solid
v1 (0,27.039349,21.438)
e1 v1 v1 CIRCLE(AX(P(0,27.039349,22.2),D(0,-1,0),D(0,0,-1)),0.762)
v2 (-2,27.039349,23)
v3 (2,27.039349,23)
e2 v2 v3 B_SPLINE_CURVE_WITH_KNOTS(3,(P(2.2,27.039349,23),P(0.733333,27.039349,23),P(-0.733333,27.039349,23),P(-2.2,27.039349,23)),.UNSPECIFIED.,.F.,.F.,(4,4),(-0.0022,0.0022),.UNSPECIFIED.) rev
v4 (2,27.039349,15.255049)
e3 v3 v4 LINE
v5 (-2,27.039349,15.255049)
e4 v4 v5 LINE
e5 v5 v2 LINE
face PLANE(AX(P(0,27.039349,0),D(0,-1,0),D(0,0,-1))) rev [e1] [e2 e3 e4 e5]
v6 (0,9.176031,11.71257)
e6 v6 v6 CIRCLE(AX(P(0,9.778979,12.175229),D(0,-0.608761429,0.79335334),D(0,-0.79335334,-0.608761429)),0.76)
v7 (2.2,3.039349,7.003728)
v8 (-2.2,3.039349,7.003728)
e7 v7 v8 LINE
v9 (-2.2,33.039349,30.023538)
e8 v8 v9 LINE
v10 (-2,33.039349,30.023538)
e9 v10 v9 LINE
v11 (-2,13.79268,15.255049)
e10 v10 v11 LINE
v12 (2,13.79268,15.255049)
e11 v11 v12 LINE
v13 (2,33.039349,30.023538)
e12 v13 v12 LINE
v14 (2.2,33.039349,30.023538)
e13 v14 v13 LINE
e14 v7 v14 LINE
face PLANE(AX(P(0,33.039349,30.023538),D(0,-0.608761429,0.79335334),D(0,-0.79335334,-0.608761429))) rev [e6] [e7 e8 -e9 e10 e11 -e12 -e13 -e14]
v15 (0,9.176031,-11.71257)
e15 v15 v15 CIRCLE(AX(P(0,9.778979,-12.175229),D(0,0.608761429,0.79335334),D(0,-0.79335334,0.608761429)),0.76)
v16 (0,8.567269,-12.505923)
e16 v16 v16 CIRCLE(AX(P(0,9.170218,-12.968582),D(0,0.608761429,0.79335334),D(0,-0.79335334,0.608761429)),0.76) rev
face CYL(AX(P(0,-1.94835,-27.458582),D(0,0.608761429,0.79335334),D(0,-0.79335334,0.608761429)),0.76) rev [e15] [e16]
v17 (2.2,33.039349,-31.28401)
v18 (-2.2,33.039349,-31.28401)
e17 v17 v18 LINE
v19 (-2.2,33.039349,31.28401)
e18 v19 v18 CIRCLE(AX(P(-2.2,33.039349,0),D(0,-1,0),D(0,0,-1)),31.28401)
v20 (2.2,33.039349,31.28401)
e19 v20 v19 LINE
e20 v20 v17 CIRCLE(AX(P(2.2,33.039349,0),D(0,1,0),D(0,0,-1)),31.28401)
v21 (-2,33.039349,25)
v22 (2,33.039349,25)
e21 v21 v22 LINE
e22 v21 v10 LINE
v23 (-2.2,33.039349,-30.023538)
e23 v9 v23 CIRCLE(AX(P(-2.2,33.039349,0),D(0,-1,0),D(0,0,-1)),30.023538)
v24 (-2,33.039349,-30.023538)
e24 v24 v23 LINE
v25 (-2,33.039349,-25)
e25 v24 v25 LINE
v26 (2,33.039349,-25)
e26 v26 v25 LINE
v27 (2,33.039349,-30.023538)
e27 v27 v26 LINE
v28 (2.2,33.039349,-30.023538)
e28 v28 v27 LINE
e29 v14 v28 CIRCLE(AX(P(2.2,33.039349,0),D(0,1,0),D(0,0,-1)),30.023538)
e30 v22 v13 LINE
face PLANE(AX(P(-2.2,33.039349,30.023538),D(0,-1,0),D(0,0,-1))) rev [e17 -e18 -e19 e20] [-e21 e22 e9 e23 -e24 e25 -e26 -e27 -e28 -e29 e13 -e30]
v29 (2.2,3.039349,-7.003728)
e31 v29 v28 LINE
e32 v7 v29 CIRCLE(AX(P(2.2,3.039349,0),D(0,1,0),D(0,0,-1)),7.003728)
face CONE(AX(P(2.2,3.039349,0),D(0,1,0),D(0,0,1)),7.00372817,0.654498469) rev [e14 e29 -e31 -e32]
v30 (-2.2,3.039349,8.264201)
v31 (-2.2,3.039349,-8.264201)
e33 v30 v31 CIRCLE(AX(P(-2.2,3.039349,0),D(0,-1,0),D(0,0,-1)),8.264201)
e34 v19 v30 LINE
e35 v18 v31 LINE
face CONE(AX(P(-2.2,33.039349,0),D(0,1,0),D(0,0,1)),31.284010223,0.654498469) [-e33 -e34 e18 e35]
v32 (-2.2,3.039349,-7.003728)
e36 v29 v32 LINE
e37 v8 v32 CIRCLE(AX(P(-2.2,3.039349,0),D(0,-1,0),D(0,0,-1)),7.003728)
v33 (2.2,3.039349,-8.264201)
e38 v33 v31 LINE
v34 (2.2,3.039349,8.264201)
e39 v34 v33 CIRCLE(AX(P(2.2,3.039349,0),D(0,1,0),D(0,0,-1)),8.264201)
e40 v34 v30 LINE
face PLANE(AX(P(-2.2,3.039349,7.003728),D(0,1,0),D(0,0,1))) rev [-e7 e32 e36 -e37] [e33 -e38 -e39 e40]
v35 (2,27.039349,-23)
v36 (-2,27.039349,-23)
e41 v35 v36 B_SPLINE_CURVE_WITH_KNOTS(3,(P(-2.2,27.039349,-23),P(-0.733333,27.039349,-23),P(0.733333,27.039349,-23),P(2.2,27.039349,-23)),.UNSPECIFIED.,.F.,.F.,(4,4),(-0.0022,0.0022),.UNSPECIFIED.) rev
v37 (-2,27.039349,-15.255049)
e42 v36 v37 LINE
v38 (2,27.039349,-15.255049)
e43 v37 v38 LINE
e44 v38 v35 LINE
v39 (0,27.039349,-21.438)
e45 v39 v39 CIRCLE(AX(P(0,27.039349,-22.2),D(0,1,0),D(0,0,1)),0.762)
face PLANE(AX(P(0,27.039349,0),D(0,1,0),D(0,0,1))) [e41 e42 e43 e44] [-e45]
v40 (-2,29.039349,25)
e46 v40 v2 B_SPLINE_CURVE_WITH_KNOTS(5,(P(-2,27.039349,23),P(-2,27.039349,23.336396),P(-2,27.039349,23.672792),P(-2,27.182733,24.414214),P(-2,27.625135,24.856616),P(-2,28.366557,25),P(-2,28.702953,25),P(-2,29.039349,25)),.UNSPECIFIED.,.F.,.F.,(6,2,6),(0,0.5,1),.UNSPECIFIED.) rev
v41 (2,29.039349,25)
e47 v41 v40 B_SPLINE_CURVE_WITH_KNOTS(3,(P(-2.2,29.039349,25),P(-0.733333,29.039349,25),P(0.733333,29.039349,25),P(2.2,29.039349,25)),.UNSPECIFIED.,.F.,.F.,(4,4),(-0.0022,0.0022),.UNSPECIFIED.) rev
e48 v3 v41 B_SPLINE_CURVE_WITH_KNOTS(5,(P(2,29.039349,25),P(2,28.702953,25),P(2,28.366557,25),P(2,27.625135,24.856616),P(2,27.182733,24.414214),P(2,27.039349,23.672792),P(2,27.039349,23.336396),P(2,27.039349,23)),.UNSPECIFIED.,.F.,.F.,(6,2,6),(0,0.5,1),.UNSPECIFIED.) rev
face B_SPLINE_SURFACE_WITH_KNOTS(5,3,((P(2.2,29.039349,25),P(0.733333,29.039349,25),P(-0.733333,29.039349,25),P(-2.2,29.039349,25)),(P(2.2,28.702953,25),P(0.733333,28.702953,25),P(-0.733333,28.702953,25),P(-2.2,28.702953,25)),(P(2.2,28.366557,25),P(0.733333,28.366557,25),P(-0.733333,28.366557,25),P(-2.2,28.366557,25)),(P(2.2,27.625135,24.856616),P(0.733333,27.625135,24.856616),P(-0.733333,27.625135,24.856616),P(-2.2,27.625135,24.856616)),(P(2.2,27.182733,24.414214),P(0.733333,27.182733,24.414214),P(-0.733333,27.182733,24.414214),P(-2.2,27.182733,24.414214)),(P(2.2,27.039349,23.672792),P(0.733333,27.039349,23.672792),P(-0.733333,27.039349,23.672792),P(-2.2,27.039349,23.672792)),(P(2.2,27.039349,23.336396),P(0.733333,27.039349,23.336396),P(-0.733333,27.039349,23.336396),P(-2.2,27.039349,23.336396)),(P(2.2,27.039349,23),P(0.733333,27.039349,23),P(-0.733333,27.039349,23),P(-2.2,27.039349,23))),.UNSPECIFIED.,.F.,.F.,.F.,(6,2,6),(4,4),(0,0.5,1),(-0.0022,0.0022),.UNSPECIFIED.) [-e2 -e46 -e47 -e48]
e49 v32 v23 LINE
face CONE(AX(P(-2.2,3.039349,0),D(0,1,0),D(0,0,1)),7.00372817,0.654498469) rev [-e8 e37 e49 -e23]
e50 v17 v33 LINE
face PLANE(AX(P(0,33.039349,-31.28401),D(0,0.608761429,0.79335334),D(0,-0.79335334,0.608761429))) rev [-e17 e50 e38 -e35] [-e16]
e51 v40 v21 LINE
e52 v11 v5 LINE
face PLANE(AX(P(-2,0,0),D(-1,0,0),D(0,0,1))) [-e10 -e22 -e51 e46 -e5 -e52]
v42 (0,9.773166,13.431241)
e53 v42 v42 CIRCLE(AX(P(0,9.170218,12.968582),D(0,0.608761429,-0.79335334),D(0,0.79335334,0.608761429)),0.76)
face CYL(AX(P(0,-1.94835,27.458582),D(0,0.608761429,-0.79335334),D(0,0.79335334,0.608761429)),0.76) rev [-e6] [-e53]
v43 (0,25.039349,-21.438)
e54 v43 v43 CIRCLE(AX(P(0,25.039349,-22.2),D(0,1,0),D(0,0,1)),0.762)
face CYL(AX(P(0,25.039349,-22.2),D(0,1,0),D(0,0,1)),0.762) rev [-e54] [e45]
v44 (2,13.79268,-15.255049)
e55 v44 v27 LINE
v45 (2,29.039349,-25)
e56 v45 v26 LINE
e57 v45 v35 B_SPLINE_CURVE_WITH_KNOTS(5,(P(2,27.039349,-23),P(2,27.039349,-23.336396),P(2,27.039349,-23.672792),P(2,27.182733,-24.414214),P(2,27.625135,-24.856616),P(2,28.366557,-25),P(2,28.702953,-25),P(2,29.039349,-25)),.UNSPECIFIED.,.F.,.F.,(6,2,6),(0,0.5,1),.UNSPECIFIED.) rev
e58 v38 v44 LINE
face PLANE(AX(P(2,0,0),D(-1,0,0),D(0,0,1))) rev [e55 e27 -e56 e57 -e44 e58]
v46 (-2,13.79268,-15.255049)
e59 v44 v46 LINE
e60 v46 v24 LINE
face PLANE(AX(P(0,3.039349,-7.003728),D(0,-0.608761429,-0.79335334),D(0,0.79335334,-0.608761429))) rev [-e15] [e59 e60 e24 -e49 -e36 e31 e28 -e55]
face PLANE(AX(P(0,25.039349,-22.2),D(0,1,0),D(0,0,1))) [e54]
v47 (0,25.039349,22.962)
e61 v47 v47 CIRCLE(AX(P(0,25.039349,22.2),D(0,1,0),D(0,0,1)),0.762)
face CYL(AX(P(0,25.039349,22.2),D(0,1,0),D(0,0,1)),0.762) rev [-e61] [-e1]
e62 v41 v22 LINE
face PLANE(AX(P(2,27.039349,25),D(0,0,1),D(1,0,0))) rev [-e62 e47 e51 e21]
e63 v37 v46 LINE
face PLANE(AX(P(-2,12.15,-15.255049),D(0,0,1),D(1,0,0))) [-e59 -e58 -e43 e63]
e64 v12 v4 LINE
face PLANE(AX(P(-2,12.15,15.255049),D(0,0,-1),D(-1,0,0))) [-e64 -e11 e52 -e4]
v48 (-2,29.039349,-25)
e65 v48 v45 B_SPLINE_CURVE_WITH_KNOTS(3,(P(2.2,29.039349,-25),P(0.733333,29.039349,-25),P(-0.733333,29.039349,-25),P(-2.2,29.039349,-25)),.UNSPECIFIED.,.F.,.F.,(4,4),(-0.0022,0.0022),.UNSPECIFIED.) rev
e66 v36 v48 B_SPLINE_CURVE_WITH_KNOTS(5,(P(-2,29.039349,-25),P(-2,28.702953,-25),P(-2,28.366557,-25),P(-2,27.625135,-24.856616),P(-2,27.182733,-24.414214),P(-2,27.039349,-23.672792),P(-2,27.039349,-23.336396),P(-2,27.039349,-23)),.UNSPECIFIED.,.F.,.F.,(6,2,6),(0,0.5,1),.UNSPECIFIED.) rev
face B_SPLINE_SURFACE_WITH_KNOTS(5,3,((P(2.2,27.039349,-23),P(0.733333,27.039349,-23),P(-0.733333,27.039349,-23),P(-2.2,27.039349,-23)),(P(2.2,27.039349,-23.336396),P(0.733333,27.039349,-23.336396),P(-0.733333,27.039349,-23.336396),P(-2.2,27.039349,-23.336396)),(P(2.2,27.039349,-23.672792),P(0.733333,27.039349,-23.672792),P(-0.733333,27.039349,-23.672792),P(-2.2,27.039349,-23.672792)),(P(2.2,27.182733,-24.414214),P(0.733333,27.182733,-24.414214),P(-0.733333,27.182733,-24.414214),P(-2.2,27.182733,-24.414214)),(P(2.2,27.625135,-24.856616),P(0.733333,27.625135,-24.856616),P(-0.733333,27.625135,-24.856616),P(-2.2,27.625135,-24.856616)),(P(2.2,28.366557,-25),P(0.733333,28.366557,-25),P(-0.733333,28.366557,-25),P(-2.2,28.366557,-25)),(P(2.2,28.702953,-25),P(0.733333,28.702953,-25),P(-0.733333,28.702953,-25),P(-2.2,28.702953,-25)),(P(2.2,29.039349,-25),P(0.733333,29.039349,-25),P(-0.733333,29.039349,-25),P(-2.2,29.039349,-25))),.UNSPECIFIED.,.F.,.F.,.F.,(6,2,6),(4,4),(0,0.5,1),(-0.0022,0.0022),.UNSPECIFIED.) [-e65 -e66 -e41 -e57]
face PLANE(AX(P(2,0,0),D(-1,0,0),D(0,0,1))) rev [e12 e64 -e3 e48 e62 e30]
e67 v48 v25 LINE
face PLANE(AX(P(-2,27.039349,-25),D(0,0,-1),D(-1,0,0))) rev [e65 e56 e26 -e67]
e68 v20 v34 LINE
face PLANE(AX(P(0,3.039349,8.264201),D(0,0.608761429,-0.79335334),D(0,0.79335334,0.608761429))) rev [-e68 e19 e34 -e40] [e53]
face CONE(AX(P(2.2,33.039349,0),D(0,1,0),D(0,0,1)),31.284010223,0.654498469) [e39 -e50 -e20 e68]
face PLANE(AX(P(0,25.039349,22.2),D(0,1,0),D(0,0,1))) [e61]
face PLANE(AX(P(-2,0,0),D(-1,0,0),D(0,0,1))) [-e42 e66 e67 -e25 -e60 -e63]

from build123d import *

# Parameters (mm, degrees)
CONEREVOLVE_ANGLE                = 90
CONEREVOLVE_OTHER_WAY_ANGLE      = 90
CONE_EDGE_BOSS_EXTRUDE15_DEPTH   = 2.2
MOUNTING_HOLE_CUT_EXTRUDE6_REACH = 61.483
SKETCH90_R                       = 0.76
REINFORCINGSPAR_DEPTH            = 2
REINFORCINGSPAR_DEPTH_BACK       = 2
SKETCH94_W                       = 4
SKETCH94_H                       = 9.744950827
CUT_EXTRUDE1_DEPTH               = 6
FILLET2_SIZE                     = 2
SKETCH98_R                       = 0.762
CUT_EXTRUDE2_DEPTH               = 8


with BuildPart() as part:
    # Sketch88 → ConeRevolve (revolve)
    with BuildSketch(Plane(origin=(50.074313091, 0, 0), x_dir=(1, 0, 0), z_dir=(0, 0, 1))):
        Polygon((-82.2978509, 33.039348741), (-59.278041261, 3.039348741), (-60.538513675, 3.039348741), (-83.558323314, 33.039348741), align=None)
    revolve(axis=Axis((-2.2, -0.345734695, 0), (0, 1, 0)), revolution_arc=CONEREVOLVE_ANGLE)

    # Sketch88 → ConeRevolve other way (revolve)
    with BuildSketch(Plane(origin=(50.074313091, 0, 0), x_dir=(1, 0, 0), z_dir=(0, 0, 1))):
        Polygon((-82.2978509, 33.039348741), (-59.278041261, 3.039348741), (-60.538513675, 3.039348741), (-83.558323314, 33.039348741), align=None)
    revolve(axis=Axis((-2.2, -0.345734695, 0), (0, -1, 0)), revolution_arc=CONEREVOLVE_OTHER_WAY_ANGLE)

    # Sketch89 → Cone-Edge-Boss-Extrude15 (add)
    with BuildSketch(Plane(origin=(-2.2, 0, 0), x_dir=(0, 0, -1), z_dir=(1, 0, 0))):
        Polygon((-7.00372817, 3.039348741), (-8.264200584, 3.039348741), (-31.284010223, 33.039348741), (-30.023537809, 33.039348741), align=None)
        Polygon((8.264200584, 3.039348741), (7.00372817, 3.039348741), (30.023537809, 33.039348741), (31.284010223, 33.039348741), align=None)
    extrude(amount=CONE_EDGE_BOSS_EXTRUDE15_DEPTH)

    # Cone-Edge-Mirror: part across plane


with BuildPart() as part_1:
    add(part.part)
    add(part.part.mirror(Plane(origin=(0, 0, 0), x_dir=(0, 0, 1), z_dir=(1, 0, 0))))

    # Sketch90 → Mounting-Hole-Cut-Extrude6 (cut, up to next)
    with BuildSketch(Plane(origin=(0, -2.256187259, 2.940320481), x_dir=(1, 0, 0), z_dir=(2.7745173069220206e-15, -0.6087614290087164, 0.7933533402912384)), mode=Mode.PRIVATE) as mounting_hole_cut_extrude6_sk1:
        with Locations(Location((0, 15.169995435, 0), (0, 0, 90))):
            Circle(SKETCH90_R)
    mounting_hole_cut_extrude6_tool1 = extrude(mounting_hole_cut_extrude6_sk1.sketch, amount=MOUNTING_HOLE_CUT_EXTRUDE6_REACH, mode=Mode.PRIVATE) & part_1.part
    mounting_hole_cut_extrude6 = mounting_hole_cut_extrude6_tool1.solids().sort_by_distance((0, 9.778979, 12.175229))[0]
    add(mounting_hole_cut_extrude6, mode=Mode.SUBTRACT)

    # Mirror1: Mounting-Hole-Cut-Extrude6 across plane
    add(mounting_hole_cut_extrude6.mirror(Plane.XY), mode=Mode.SUBTRACT)

    # Sketch92 → ReinforcingSpar (add, two sides: drawn at the far end of the back side and taken through both)
    with BuildSketch(Plane(origin=(0, 0, 4.051072987), x_dir=(0, 0, -1), z_dir=(1, 0, 0)).offset(-REINFORCINGSPAR_DEPTH_BACK)):
        Polygon((-11.203976186, 33.039348741), (-27.232937236, 33.039348741), (-11.203976186, 12.15), align=None)
        Polygon((19.30612216, 33.039348741), (35.33508321, 33.039348741), (19.30612216, 12.15), align=None)
    extrude(amount=REINFORCINGSPAR_DEPTH + REINFORCINGSPAR_DEPTH_BACK)

    # Sketch94 → Cut-Extrude1 (cut)
    with BuildSketch(Plane(origin=(0, 33.039348741, 0), x_dir=(1, 0, 0), z_dir=(0, 1, 0))):
        with Locations((0, 20.127524587)):
            Rectangle(SKETCH94_W, SKETCH94_H)
        with Locations((0, -20.127524587)):
            Rectangle(SKETCH94_W, SKETCH94_H)
    extrude(amount=-CUT_EXTRUDE1_DEPTH, mode=Mode.SUBTRACT)

    # Fillet2
    # a fillet whose section is not a circle: 2 mm, written as the material it adds along each edge
    with BuildSketch(Plane(origin=(-2, 27.039348741, -25), x_dir=(0, 1, 0), z_dir=(1, 0, 0))) as fillet2_piece_1:
        with BuildLine():
            add(Edge.make_bspline([(FILLET2_SIZE, 0), (FILLET2_SIZE * 0.831801948466, 0), (FILLET2_SIZE * 0.663603896932, 0), (FILLET2_SIZE * 0.292893218813, FILLET2_SIZE * 0.0716919198361), (FILLET2_SIZE * 0.0716919198361, FILLET2_SIZE * 0.292893218813), (0, FILLET2_SIZE * 0.663603896932), (0, FILLET2_SIZE * 0.831801948466), (0, FILLET2_SIZE)], knots=[0, 0, 0, 0, 0, 0, 0.5, 0.5, 1, 1, 1, 1, 1, 1], degree=5))
            Line((0, FILLET2_SIZE), (-FILLET2_SIZE * 0.02, FILLET2_SIZE))
            Line((-FILLET2_SIZE * 0.02, FILLET2_SIZE), (-FILLET2_SIZE * 0.02, -FILLET2_SIZE * 0.02))
            Line((-FILLET2_SIZE * 0.02, -FILLET2_SIZE * 0.02), (FILLET2_SIZE, -FILLET2_SIZE * 0.02))
            Line((FILLET2_SIZE, -FILLET2_SIZE * 0.02), (FILLET2_SIZE, 0))
        make_face()
    extrude(amount=4)
    with BuildSketch(Plane(origin=(-2, 27.039348741, 25), x_dir=(0, 1, 0), z_dir=(1, 0, 0))) as fillet2_piece_2:
        with BuildLine():
            add(Edge.make_bspline([(FILLET2_SIZE, 0), (FILLET2_SIZE * 0.831801948466, 0), (FILLET2_SIZE * 0.663603896932, 0), (FILLET2_SIZE * 0.292893218813, -FILLET2_SIZE * 0.0716919198361), (FILLET2_SIZE * 0.0716919198361, -FILLET2_SIZE * 0.292893218813), (0, -FILLET2_SIZE * 0.663603896932), (0, -FILLET2_SIZE * 0.831801948466), (0, -FILLET2_SIZE)], knots=[0, 0, 0, 0, 0, 0, 0.5, 0.5, 1, 1, 1, 1, 1, 1], degree=5))
            Line((0, -FILLET2_SIZE), (-FILLET2_SIZE * 0.02, -FILLET2_SIZE))
            Line((-FILLET2_SIZE * 0.02, -FILLET2_SIZE), (-FILLET2_SIZE * 0.02, FILLET2_SIZE * 0.02))
            Line((-FILLET2_SIZE * 0.02, FILLET2_SIZE * 0.02), (FILLET2_SIZE, FILLET2_SIZE * 0.02))
            Line((FILLET2_SIZE, FILLET2_SIZE * 0.02), (FILLET2_SIZE, 0))
        make_face()
    extrude(amount=4)

    # Sketch98 → Cut-Extrude2 (cut)
    with BuildSketch(Plane(origin=(0, 33.039348741, 0), x_dir=(1, 0, 0), z_dir=(0, 1, 0))):
        with Locations(Location((0, -22.2, 0), (0, 0, 270))):
            Circle(SKETCH98_R)
        with Locations(Location((0, 22.2, 0), (0, 0, 270))):
            Circle(SKETCH98_R)
    extrude(amount=-CUT_EXTRUDE2_DEPTH, mode=Mode.SUBTRACT)


solid = part_1.part
